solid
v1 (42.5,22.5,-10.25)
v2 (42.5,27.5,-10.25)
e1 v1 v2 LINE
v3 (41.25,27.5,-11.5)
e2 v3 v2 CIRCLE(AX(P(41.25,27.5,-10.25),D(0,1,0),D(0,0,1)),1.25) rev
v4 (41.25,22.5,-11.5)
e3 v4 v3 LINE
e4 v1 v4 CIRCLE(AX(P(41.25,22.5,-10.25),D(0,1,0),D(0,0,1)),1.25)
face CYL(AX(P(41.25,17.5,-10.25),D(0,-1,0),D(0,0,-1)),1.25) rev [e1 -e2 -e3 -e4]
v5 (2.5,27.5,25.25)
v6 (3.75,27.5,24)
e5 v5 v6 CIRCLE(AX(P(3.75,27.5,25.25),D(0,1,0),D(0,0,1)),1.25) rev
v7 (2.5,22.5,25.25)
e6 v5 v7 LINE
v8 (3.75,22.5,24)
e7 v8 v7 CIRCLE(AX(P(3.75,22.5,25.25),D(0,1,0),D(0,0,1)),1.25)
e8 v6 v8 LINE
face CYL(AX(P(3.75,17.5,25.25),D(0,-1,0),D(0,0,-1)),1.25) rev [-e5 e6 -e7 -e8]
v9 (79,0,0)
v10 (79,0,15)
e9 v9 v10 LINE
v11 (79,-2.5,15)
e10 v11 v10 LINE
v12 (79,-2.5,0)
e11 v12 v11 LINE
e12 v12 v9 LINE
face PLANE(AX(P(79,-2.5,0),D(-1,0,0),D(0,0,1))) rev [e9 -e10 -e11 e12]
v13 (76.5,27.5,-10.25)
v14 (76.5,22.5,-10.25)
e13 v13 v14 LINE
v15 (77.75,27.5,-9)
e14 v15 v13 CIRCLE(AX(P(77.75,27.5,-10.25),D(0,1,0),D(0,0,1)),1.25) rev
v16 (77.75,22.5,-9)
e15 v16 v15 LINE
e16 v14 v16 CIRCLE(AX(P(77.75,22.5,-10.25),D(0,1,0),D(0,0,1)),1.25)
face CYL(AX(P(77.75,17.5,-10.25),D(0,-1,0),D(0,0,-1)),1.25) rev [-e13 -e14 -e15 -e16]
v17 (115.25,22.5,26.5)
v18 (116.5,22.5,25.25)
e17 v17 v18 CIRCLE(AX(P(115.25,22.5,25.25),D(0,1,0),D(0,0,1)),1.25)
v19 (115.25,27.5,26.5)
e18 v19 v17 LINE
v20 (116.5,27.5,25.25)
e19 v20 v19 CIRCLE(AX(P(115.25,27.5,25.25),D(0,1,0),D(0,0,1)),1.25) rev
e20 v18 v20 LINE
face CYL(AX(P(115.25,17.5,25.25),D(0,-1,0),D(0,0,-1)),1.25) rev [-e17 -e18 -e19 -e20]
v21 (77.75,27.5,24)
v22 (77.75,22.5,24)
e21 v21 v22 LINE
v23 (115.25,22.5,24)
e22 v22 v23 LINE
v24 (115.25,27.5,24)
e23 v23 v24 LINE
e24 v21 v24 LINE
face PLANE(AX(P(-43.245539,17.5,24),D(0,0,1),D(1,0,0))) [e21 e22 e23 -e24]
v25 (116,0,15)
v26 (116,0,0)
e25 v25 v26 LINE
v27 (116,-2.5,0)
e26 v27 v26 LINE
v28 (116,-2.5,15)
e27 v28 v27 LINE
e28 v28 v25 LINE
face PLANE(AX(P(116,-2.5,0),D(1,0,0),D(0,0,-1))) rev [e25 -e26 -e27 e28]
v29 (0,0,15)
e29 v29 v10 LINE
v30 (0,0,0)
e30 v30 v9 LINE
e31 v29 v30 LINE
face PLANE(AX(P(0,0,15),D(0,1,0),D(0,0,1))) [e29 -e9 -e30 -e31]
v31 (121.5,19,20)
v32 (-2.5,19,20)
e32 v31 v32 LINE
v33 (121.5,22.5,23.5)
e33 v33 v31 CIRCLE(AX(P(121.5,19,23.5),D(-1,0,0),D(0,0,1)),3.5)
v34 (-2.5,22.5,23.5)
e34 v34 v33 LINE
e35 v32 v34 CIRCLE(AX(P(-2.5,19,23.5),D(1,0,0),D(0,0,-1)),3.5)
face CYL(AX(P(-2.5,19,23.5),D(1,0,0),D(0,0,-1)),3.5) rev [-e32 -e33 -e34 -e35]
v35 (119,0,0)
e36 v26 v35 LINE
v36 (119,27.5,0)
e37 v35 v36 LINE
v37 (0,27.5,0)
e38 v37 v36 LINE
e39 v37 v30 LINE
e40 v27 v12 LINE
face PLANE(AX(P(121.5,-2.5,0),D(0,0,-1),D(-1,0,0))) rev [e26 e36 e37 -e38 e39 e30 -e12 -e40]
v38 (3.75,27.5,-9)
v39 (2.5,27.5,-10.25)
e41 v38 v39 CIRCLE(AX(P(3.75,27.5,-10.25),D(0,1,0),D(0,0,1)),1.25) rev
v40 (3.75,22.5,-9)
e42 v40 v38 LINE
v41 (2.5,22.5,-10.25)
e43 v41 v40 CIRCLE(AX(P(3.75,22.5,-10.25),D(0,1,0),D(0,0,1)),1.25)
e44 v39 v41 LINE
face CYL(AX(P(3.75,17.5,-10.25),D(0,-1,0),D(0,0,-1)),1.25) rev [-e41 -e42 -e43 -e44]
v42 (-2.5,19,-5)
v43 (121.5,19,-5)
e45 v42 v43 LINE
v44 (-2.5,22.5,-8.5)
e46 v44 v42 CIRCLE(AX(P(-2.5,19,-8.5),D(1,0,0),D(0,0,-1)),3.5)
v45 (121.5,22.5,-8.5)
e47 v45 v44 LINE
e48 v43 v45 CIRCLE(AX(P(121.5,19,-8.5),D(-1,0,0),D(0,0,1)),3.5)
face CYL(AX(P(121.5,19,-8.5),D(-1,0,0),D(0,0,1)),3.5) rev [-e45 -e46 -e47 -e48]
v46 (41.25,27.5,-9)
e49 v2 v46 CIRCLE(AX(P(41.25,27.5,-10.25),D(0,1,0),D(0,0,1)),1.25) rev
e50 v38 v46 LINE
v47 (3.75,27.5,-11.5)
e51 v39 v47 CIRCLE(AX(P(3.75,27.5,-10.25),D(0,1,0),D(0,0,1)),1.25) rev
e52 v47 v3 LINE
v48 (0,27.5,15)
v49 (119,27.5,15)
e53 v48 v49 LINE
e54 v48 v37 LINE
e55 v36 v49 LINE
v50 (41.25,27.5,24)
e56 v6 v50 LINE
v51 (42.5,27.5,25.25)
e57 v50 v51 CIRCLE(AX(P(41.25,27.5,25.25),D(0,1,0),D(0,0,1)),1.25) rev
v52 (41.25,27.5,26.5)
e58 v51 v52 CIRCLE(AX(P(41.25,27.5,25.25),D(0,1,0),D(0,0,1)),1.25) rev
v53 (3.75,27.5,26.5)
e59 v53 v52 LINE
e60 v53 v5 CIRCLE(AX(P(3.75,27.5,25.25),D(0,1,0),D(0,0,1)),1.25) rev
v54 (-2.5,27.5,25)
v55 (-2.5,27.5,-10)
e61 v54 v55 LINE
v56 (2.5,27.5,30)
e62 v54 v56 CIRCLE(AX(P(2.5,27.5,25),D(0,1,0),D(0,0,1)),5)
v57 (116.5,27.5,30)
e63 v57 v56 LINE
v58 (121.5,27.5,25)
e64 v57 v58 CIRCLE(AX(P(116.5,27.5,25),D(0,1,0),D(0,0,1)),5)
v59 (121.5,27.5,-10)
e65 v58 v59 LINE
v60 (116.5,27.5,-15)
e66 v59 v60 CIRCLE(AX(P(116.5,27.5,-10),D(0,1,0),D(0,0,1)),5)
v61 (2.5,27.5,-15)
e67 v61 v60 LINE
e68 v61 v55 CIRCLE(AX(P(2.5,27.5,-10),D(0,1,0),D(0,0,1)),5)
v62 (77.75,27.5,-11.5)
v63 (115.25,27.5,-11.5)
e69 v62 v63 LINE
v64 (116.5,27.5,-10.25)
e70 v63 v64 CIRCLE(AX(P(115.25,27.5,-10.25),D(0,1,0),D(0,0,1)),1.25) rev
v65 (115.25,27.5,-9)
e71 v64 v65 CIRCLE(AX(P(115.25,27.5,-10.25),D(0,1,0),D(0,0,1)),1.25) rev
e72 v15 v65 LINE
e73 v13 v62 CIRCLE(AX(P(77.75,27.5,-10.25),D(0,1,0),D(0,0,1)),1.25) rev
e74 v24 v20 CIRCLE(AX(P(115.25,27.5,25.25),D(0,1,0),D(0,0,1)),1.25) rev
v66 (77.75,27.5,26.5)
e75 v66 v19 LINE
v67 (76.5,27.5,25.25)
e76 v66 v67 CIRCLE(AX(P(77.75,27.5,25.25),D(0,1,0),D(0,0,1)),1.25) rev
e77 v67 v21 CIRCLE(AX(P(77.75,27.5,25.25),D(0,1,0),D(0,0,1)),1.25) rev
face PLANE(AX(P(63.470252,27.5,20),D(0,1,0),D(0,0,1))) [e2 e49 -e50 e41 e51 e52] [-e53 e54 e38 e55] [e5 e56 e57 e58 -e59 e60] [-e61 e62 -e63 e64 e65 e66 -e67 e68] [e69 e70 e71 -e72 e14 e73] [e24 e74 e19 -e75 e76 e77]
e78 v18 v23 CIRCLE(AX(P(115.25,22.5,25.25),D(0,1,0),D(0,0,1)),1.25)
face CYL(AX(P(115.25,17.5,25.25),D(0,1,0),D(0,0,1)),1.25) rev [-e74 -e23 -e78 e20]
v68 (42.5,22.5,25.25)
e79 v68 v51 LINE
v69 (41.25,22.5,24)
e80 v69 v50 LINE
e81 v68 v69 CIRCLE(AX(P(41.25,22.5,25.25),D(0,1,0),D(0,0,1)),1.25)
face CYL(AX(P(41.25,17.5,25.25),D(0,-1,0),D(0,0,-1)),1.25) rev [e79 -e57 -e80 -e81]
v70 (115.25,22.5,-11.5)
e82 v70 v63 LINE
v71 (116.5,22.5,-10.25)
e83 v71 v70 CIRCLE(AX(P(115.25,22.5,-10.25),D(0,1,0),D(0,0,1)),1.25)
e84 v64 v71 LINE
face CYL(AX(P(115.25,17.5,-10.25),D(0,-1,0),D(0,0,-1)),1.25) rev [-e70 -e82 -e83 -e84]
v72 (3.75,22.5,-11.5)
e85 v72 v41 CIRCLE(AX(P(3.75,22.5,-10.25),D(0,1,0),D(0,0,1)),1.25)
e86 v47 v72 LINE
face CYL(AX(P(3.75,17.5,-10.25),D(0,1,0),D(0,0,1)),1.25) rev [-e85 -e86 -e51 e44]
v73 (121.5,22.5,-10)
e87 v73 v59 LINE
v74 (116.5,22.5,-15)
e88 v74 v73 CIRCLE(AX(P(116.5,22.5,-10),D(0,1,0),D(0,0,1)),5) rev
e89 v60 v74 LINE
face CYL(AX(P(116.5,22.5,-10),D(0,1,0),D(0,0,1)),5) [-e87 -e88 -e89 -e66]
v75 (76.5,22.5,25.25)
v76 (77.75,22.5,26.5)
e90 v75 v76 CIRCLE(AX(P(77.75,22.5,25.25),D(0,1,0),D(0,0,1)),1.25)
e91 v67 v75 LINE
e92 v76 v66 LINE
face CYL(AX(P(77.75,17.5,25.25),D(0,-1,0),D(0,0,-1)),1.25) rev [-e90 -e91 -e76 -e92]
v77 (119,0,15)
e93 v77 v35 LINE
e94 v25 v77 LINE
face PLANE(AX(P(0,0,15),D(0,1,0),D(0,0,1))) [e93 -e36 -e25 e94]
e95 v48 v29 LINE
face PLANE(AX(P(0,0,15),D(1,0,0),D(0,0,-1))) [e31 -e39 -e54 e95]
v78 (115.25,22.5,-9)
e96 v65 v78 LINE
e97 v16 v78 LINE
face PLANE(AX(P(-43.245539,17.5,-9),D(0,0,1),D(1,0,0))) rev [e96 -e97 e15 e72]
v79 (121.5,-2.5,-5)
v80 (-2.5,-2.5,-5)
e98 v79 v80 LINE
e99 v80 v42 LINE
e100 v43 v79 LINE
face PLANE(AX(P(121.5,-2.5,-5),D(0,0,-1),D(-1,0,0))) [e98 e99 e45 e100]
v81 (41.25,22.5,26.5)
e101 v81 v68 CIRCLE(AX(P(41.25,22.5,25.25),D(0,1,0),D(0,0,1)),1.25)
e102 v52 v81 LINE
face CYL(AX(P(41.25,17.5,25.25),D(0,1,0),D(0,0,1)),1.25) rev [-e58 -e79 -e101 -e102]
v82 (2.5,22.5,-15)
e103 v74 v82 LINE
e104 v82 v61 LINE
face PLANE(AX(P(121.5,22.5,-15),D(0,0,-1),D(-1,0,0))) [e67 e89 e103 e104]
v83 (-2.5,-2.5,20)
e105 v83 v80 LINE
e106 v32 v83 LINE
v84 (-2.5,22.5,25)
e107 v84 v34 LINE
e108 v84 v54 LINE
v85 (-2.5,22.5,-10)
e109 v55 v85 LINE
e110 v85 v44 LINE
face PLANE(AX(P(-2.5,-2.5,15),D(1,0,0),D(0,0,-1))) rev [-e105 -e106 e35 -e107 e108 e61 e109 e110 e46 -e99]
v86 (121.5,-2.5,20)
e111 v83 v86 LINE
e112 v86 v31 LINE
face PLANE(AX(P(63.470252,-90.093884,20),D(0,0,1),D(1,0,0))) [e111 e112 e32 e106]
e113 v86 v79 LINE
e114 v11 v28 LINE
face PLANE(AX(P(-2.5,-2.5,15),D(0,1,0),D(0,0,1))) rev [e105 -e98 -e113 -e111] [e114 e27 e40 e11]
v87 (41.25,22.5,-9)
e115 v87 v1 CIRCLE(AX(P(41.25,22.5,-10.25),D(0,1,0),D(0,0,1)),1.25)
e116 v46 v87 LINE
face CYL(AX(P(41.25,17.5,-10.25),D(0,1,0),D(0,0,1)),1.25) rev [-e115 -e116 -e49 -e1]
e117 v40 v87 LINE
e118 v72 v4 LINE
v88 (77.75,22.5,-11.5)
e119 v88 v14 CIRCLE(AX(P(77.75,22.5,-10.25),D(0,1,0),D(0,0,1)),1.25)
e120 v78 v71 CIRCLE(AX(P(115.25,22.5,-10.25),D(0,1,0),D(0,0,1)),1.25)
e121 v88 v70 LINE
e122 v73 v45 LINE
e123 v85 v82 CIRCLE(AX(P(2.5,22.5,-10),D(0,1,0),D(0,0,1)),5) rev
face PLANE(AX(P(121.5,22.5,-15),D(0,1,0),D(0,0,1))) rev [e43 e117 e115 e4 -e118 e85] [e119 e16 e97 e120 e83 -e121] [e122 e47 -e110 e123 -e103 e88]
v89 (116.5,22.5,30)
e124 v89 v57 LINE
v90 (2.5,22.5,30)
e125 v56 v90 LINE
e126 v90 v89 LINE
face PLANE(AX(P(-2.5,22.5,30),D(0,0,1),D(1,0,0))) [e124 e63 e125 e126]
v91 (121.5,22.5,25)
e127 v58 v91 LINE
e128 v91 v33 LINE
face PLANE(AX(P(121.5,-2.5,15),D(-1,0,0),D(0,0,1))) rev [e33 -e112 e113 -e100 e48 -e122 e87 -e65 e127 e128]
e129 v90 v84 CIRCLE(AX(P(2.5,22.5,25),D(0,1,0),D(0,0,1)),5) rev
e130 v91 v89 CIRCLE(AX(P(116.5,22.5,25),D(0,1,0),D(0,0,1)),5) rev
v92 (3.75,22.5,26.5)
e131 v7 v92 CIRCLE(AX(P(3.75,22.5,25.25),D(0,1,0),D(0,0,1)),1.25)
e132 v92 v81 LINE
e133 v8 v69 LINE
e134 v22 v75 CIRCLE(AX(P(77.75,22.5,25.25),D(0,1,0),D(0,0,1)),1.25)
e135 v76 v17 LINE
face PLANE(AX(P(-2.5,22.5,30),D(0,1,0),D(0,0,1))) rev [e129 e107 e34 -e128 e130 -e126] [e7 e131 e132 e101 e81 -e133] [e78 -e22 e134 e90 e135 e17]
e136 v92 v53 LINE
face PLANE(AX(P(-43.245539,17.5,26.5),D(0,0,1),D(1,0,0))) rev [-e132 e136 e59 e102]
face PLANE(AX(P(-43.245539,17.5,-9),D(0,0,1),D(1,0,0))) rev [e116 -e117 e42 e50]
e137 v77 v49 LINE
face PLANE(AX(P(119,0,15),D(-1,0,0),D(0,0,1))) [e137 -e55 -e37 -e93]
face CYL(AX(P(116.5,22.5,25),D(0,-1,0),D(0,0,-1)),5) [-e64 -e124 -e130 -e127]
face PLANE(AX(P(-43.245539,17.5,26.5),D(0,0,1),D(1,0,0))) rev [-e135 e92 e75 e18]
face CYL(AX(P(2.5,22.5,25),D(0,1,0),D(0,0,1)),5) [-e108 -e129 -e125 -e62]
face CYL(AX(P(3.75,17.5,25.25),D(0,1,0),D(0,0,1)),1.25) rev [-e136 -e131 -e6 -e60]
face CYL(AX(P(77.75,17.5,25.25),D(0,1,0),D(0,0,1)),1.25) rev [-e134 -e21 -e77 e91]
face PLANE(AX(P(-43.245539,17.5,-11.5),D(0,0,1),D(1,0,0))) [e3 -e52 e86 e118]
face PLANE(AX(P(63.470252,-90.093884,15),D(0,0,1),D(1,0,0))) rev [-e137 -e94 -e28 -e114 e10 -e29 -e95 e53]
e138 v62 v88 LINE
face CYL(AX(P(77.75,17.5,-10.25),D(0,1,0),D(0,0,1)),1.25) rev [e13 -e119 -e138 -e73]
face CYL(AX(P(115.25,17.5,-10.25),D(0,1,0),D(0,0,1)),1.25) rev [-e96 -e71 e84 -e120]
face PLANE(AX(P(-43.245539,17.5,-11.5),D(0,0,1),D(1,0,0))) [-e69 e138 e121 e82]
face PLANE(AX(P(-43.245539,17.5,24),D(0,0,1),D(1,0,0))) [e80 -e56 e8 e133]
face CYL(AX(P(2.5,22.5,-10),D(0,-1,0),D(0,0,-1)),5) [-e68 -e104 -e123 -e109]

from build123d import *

# Parameters (mm, degrees)
ESQUISSE1_W             = 124
ESQUISSE1_H             = 66
ESQUISSE1_W_2           = 119
ESQUISSE1_H_2           = 61
BOSS_EXTRU_1_DEPTH      = 15
ESQUISSE2_W             = 124
ESQUISSE2_H             = 30
BOSS_EXTRU_2_DEPTH      = 5
ESQUISSE3_W             = 124
ESQUISSE3_H             = 30
BOSS_EXTRU_3_DEPTH      = 5
ESQUISSE2_4_W           = 119
ESQUISSE2_4_H           = 33.5
ENL_V_MAT_EXTRU_2_DEPTH = 139.544216769
ESQUISSE4_W             = 124
ESQUISSE4_H             = 5
BOSS_EXTRU_4_DEPTH      = 10
ESQUISSE6_W             = 124
ESQUISSE6_H             = 5
BOSS_EXTRU_5_DEPTH      = 10
ESQUISSE5_W             = 40
ESQUISSE5_H             = 2.5
ENL_V_MAT_EXTRU_3_DEPTH = 10
CONG_5_R                = 5
CONG_6_R                = 3.5
CONG_7_R                = 1.25
ESQUISSE7_W             = 37
ESQUISSE7_H             = 15
ENL_V_MAT_EXTRU_4_DEPTH = 129.134694755


with BuildPart() as part:
    # Esquisse1 → Boss.-Extru.1 (new body)
    with BuildSketch(Plane.XY):
        with Locations((59.5, 30.5)):
            Rectangle(ESQUISSE1_W, ESQUISSE1_H)
        with Locations((59.5, 30.5)):
            Rectangle(ESQUISSE1_W_2, ESQUISSE1_H_2, mode=Mode.SUBTRACT)
    extrude(amount=BOSS_EXTRU_1_DEPTH)

    # Esquisse2 → Boss.-Extru.2 (add)
    with BuildSketch(Plane.XY.offset(15)):
        with Locations((59.5, 12.5)):
            Rectangle(ESQUISSE2_W, ESQUISSE2_H)
    extrude(amount=BOSS_EXTRU_2_DEPTH)

    # Esquisse3 → Boss.-Extru.3 (add)
    with BuildSketch(Plane(origin=(0, 0, 0), x_dir=(-1, 0, 0), z_dir=(0, 0, -1))):
        with Locations((-59.5, 12.5)):
            Rectangle(ESQUISSE3_W, ESQUISSE3_H)
    extrude(amount=BOSS_EXTRU_3_DEPTH)

    # Esquisse2<4> → Enlèv. mat.-Extru.2 (cut, through all)
    with BuildSketch(Plane.XY.offset(15)):
        Polygon((-2.5, 63.5), (-2.5, 27.5), (0, 27.5), (0, 61), (119, 61), (119, 27.5), (121.5, 27.5), (121.5, 63.5), align=None)
        with Locations((59.5, 44.25)):
            Rectangle(ESQUISSE2_4_W, ESQUISSE2_4_H)
        Polygon((-7.324686497, 27.5), (-2.5, 27.5), (-2.5, 63.5), (121.5, 63.5), (121.5, 27.5), (134.265191069, 27.5), (134.265191069, 70.183408252), (-7.324686497, 70.183408252), align=None)
    extrude(amount=-ENL_V_MAT_EXTRU_2_DEPTH, mode=Mode.SUBTRACT)

    # Esquisse4 → Boss.-Extru.4 (add)
    with BuildSketch(Plane.XY.offset(20)):
        with Locations((59.5, 25)):
            Rectangle(ESQUISSE4_W, ESQUISSE4_H)
    extrude(amount=BOSS_EXTRU_4_DEPTH)

    # Esquisse6 → Boss.-Extru.5 (add)
    with BuildSketch(Plane(origin=(0, 0, -5), x_dir=(-1, 0, 0), z_dir=(0, 0, -1))):
        with Locations((-59.5, 25)):
            Rectangle(ESQUISSE6_W, ESQUISSE6_H)
    extrude(amount=BOSS_EXTRU_5_DEPTH)

    # Esquisse5 → Enlèv. mat.-Extru.3 (cut)
    with BuildSketch(Plane(origin=(0, 27.5, 0), x_dir=(1, 0, 0), z_dir=(0, 1, 0))):
        with Locations((22.5, -25.25)):
            Rectangle(ESQUISSE5_W, ESQUISSE5_H)
        with Locations((96.5, -25.25)):
            Rectangle(ESQUISSE5_W, ESQUISSE5_H)
        with Locations((22.5, 10.25)):
            Rectangle(ESQUISSE5_W, ESQUISSE5_H)
        with Locations((96.5, 10.25)):
            Rectangle(ESQUISSE5_W, ESQUISSE5_H)
    extrude(amount=-ENL_V_MAT_EXTRU_3_DEPTH, mode=Mode.SUBTRACT)

    # Congé5
    cong_5_edges = [part.edges().sort_by_distance(p)[0] for p in [
        (121.5, 25, 30),
        (121.5, 25, -15),
        (-2.5, 25, -15),
        (-2.5, 25, 30),
    ]]
    fillet(cong_5_edges, radius=CONG_5_R)

    # Congé6
    cong_6_edges = [part.edges().sort_by_distance(p)[0] for p in [
        (59.5, 22.5, 20),
        (59.5, 22.5, -5),
    ]]
    fillet(cong_6_edges, radius=CONG_6_R)

    # Congé7
    cong_7_edges = [part.edges().sort_by_distance(p)[0] for p in [
        (76.5, 25, -11.5),
        (76.5, 25, -9),
        (116.5, 25, -9),
        (116.5, 25, -11.5),
        (42.5, 25, -11.5),
        (42.5, 25, -9),
        (2.5, 25, -11.5),
        (2.5, 25, -9),
        (2.5, 25, 24),
        (2.5, 25, 26.5),
        (42.5, 25, 24),
        (42.5, 25, 26.5),
        (76.5, 25, 24),
        (76.5, 25, 26.5),
        (116.5, 25, 24),
        (116.5, 25, 26.5),
    ]]
    fillet(cong_7_edges, radius=CONG_7_R - 0.0001)  # a hair under: the kernel refuses the full size

    # Esquisse7 → Enlèv. mat.-Extru.4 (cut, through all)
    with BuildSketch(Plane(origin=(0, 0, 0), x_dir=(1, 0, 0), z_dir=(0, 1, 0))):
        with Locations((97.5, -7.5)):
            Rectangle(ESQUISSE7_W, ESQUISSE7_H)
    extrude(amount=-ENL_V_MAT_EXTRU_4_DEPTH, mode=Mode.SUBTRACT)


solid = part.part
